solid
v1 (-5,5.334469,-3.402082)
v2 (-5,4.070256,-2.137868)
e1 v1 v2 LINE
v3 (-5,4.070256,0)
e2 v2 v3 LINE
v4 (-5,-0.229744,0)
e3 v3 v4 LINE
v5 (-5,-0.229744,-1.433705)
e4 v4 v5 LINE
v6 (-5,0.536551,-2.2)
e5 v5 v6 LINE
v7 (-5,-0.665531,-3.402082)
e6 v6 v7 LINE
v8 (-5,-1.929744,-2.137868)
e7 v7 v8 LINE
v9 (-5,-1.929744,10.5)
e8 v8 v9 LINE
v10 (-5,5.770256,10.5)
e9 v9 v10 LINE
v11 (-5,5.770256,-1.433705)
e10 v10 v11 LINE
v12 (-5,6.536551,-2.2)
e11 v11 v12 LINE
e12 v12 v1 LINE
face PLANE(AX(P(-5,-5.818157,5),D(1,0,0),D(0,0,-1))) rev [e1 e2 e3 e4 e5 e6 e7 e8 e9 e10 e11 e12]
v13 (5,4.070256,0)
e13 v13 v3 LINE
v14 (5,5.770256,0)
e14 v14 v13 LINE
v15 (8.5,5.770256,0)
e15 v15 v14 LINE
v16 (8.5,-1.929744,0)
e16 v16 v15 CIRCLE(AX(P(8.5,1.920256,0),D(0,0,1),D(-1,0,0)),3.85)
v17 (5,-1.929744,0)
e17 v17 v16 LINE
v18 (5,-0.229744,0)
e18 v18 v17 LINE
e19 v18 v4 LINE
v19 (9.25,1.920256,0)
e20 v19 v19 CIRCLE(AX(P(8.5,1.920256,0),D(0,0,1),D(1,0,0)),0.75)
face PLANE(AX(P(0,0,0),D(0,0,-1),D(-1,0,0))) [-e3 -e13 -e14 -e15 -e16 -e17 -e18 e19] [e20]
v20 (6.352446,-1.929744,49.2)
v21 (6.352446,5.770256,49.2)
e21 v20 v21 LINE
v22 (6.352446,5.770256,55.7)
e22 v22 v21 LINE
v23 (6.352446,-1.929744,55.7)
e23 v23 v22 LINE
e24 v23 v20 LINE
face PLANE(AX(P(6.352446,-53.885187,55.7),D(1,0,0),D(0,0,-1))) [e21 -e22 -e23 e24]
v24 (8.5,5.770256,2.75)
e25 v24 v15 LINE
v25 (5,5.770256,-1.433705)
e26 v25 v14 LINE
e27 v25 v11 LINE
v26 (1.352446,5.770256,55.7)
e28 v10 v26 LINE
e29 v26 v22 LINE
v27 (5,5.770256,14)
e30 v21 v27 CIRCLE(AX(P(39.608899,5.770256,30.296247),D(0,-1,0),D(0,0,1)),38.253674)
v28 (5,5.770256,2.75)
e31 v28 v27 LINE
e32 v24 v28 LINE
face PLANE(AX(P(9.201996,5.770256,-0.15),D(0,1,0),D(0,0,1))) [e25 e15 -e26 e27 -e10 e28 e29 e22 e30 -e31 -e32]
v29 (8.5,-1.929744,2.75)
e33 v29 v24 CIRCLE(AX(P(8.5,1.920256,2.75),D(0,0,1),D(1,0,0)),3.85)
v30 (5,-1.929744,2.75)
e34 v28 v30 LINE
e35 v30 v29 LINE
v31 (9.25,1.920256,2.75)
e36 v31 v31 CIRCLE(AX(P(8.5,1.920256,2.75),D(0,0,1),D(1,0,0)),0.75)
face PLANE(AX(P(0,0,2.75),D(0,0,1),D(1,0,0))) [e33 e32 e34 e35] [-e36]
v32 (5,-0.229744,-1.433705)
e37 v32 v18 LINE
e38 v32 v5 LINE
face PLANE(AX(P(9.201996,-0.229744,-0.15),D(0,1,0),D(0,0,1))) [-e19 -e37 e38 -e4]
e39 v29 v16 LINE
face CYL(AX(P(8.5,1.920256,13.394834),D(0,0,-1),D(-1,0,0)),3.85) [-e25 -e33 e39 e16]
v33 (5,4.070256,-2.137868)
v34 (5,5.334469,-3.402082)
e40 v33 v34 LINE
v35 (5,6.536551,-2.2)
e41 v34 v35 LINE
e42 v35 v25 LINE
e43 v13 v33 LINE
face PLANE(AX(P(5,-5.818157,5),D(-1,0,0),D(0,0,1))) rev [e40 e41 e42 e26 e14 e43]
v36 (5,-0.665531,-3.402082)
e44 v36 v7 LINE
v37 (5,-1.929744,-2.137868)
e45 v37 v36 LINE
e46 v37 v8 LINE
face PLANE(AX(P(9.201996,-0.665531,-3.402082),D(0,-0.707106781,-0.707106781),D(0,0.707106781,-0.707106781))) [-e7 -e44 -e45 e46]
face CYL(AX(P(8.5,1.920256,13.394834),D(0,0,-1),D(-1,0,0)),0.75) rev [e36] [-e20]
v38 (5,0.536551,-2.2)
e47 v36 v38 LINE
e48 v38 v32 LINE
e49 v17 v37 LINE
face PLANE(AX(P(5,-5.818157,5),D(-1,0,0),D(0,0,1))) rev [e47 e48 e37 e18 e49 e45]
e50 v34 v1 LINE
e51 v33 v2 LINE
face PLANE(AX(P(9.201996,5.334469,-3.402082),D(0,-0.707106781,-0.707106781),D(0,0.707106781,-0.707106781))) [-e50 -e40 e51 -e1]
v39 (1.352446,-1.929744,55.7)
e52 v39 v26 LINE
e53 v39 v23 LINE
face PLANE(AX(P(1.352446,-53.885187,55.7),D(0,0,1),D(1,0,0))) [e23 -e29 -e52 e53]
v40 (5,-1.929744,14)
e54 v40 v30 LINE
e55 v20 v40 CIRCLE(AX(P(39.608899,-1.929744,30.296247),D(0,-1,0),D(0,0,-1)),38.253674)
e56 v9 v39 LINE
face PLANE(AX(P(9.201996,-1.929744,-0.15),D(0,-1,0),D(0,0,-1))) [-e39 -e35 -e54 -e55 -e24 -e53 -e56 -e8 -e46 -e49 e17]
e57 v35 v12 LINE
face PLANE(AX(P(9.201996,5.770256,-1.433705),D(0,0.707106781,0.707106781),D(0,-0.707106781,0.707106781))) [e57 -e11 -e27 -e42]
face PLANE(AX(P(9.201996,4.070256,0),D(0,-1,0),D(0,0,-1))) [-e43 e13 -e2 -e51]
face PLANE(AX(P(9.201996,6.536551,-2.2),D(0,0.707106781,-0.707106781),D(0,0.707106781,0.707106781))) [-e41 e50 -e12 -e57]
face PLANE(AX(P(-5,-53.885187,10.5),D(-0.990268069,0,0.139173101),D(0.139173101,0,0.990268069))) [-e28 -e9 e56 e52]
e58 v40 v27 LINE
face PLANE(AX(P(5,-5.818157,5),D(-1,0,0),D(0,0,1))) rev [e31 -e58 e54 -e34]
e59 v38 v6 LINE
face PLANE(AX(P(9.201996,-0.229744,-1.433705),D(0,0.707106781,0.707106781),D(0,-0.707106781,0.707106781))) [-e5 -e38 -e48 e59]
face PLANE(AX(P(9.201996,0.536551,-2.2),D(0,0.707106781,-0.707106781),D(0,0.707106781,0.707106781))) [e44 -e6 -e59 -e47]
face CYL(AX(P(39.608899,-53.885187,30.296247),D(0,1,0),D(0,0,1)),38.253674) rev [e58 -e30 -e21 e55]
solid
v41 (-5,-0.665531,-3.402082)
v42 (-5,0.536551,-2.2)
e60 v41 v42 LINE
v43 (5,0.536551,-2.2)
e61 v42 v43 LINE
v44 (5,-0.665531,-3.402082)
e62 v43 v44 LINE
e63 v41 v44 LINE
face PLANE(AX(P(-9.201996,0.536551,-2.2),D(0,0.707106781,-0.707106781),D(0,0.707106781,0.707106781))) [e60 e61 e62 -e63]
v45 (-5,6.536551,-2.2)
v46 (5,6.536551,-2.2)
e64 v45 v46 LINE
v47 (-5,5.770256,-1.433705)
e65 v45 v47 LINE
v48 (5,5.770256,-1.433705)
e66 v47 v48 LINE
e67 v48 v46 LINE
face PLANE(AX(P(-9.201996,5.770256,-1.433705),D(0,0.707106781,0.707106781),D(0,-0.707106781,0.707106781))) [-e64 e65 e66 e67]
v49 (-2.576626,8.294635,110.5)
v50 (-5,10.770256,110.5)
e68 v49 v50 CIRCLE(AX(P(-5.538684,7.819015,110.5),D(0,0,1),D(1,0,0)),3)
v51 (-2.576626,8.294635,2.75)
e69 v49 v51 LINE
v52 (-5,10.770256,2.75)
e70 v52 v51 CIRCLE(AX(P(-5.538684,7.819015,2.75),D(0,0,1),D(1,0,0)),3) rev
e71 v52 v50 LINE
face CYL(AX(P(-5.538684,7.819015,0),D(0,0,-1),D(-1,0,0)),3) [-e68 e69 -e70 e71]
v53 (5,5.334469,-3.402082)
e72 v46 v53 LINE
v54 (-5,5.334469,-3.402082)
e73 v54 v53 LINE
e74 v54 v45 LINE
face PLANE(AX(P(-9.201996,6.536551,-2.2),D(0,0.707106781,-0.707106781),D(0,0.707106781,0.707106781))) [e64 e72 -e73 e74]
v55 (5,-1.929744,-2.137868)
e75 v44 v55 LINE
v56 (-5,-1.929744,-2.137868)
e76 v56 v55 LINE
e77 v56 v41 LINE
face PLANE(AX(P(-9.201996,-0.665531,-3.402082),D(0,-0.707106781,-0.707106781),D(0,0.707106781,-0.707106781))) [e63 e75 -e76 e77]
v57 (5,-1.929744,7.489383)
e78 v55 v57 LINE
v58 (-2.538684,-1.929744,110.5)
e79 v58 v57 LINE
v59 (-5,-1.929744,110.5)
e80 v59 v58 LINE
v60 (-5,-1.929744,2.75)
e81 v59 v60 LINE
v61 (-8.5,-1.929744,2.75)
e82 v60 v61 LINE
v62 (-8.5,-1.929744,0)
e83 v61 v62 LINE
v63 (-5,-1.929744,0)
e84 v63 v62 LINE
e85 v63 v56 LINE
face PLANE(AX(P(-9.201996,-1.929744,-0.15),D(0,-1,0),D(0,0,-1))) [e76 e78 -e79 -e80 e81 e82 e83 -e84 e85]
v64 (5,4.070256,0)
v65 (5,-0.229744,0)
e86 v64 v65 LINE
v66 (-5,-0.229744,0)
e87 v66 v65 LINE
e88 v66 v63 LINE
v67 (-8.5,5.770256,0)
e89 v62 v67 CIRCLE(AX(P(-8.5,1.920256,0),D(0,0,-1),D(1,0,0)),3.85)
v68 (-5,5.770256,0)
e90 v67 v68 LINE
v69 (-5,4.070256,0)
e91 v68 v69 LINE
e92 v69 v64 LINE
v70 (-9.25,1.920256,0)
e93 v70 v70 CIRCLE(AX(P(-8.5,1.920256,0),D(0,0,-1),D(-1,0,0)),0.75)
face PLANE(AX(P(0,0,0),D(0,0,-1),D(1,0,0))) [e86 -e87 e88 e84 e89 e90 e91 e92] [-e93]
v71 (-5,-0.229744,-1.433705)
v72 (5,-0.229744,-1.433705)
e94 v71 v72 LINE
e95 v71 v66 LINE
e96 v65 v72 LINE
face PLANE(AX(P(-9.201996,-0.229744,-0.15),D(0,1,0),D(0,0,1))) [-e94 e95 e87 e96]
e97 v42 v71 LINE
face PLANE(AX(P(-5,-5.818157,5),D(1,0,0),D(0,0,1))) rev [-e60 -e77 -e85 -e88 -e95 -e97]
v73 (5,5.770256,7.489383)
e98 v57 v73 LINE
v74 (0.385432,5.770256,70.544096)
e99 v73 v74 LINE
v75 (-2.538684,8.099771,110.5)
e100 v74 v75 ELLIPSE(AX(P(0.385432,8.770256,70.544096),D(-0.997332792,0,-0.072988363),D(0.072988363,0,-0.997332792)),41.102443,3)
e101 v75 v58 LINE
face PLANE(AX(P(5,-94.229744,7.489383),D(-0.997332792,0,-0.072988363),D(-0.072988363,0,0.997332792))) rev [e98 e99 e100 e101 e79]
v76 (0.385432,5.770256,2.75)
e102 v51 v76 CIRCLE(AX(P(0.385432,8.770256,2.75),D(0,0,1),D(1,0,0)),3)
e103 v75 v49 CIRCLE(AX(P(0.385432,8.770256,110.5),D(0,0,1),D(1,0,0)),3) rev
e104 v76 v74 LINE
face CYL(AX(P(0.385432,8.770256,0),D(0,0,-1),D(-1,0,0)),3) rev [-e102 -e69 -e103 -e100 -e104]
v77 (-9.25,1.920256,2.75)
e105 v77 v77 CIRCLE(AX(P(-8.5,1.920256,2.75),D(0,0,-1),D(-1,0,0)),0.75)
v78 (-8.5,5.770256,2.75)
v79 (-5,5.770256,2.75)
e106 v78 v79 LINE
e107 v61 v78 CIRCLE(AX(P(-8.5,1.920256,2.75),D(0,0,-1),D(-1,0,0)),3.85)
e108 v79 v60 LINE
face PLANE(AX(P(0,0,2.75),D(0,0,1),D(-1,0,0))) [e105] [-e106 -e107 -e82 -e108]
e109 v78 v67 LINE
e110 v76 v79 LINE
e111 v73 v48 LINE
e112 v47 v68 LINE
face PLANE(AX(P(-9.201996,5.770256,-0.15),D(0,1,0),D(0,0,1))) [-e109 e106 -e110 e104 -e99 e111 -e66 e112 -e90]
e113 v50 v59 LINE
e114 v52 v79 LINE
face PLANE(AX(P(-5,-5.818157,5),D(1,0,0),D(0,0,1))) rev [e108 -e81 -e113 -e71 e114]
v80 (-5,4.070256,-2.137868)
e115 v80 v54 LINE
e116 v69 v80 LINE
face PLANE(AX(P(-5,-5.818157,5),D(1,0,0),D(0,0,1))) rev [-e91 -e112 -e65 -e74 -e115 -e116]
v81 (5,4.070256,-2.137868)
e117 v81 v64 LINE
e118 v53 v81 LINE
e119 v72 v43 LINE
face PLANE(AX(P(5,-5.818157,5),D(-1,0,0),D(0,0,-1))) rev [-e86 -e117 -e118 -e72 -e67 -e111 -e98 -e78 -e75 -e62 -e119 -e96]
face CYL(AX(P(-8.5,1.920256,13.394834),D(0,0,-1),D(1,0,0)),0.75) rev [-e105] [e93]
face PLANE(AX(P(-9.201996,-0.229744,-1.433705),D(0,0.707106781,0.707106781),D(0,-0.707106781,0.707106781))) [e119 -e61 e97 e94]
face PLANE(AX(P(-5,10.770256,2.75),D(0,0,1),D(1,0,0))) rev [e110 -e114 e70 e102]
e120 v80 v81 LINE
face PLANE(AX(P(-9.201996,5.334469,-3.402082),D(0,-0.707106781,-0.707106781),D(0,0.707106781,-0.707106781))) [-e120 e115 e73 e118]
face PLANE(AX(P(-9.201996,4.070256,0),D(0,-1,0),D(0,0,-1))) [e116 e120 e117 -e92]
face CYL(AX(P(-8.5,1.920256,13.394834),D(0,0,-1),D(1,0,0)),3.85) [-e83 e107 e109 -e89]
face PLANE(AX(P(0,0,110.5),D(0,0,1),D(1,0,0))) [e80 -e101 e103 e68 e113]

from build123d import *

# Parameters (mm, degrees)
SKETCH2_W           = 10
SKETCH2_H           = 14.768412439
BOSS_EXTRUDE1_DEPTH = 5
BOSS_EXTRUDE4_DEPTH = 10
SKETCH9_W           = 10
SKETCH9_H           = 3.18
SKETCH9_H_2         = 3.888412439
CUT_EXTRUDE3_DEPTH  = 5
BOSS_EXTRUDE5_DEPTH = 7.7
SKETCH12_R          = 0.75
BOSS_EXTRUDE7_DEPTH = 2.75
FILLET1_R           = 2.5
SKETCH13_W          = 13.67386451
SKETCH13_H          = 47.62797089
CUT_EXTRUDE4_DEPTH  = 100
SKETCH14_W          = 10
SKETCH14_H          = 7.7
BOSS_EXTRUDE8_DEPTH = 100
CUT_EXTRUDE5_DEPTH  = 100
SKETCH16_W          = 2.461316474
SKETCH16_H          = 107.75
BOSS_EXTRUDE9_DEPTH = 5
FILLET3_R           = 3
FILLET4_R           = 3


with BuildPart() as part:
    # Sketch2 → Boss-Extrude1 (new body)
    with BuildSketch(Plane.XY):
        with Locations((0, 1.566049366)):
            Rectangle(SKETCH2_W, SKETCH2_H)
    extrude(amount=BOSS_EXTRUDE1_DEPTH)

    # Sketch8 → Boss-Extrude4 (add)
    with BuildSketch(Plane.ZY.offset(5)):
        Polygon((-0.15, 5.770255585), (0, 5.770255585), (0, 4.070255585), (-0.15, 4.070255585), (-2.137867966, 4.070255585), (-3.402081528, 5.334469147), (-2.2, 6.536550675), (-1.43370491, 5.770255585), align=None)
        Polygon((-0.15, -1.929744415), (0, -1.929744415), (0, -0.229744415), (-0.15, -0.229744415), (-1.43370491, -0.229744415), (-2.2, 0.536550675), (-3.402081528, -0.665530853), (-2.137867966, -1.929744415), align=None)
    extrude(amount=-BOSS_EXTRUDE4_DEPTH)

    # Sketch9 → Cut-Extrude3 (cut)
    with BuildSketch(Plane(origin=(0, 0, 0), x_dir=(-1, 0, 0), z_dir=(0, 0, -1))):
        with Locations((0, 7.360255585)):
            Rectangle(SKETCH9_W, SKETCH9_H)
        with Locations((0, -3.873950635)):
            Rectangle(SKETCH9_W, SKETCH9_H_2)
    extrude(amount=-CUT_EXTRUDE3_DEPTH, mode=Mode.SUBTRACT)

    # Sketch10 → Boss-Extrude5 (add)
    with BuildSketch(Plane(origin=(0, 5.770255585, 0), x_dir=(1, 0, 0), z_dir=(0, 1, 0))):
        with BuildLine():
            Line((-5, -5), (-5, -10.5))
            Line((-5, -10.5), (1.352445729, -55.7))
            Line((1.352445729, -55.7), (6.352445729, -55.7))
            Line((6.352445729, -55.7), (6.352445729, -49.2))
            ThreePointArc((6.352445729, -49.2), (1.383429579, -31.764936646), (5, -14))
            Line((5, -14), (5, -5))
            Line((5, -5), (-5, -5))
        make_face()
    extrude(amount=-BOSS_EXTRUDE5_DEPTH)

    # Sketch12 → Boss-Extrude7 (add)
    with BuildSketch(Plane.XY):
        with BuildLine():
            Line((5, 5.770255585), (8.5, 5.770255585))
            ThreePointArc((8.5, 5.770255585), (12.35, 1.920255585), (8.5, -1.929744415))
            Line((8.5, -1.929744415), (5, -1.929744415))
            Line((5, -1.929744415), (5, 5.770255585))
        make_face()
        with Locations((8.5, 1.920255585)):
            Circle(SKETCH12_R, mode=Mode.SUBTRACT)
    extrude(amount=BOSS_EXTRUDE7_DEPTH)


with BuildPart() as body_2:
    # Mirror1: mirrored copy
    add(part.part.mirror(Plane(origin=(0, 0, 0), x_dir=(0, 0, 1), z_dir=(1, 0, 0))))

    # Fillet1
    fillet1_edges = [body_2.edges().sort_by_distance(p)[0] for p in [
        (-6.352445729, 1.920255585, 49.2),
        (-5, 1.920255585, 14),
        (-1.352445729, 1.920255585, 55.7),
        (-6.352445729, 1.920255585, 55.7),
    ]]
    fillet(fillet1_edges, radius=FILLET1_R)

    # Sketch13 → Cut-Extrude4 (cut)
    with BuildSketch(Plane(origin=(0, 5.770255585, 0), x_dir=(1, 0, 0), z_dir=(0, 1, 0))):
        with Locations((-1.836932255, -34.313985445)):
            Rectangle(SKETCH13_W, SKETCH13_H)
    extrude(amount=-CUT_EXTRUDE4_DEPTH, mode=Mode.SUBTRACT)

    # Sketch14 → Boss-Extrude8 (add)
    with BuildSketch(Plane.XY.offset(10.5)):
        with Locations((0, 1.920255585)):
            Rectangle(SKETCH14_W, SKETCH14_H)
    extrude(amount=BOSS_EXTRUDE8_DEPTH)

    # Sketch15 → Cut-Extrude5 (cut)
    with BuildSketch(Plane(origin=(0, 5.770255585, 0), x_dir=(1, 0, 0), z_dir=(0, 1, 0))):
        Polygon((5, -7.489382654), (-2.538683526, -110.5), (5, -110.5), align=None)
    extrude(amount=-CUT_EXTRUDE5_DEPTH, mode=Mode.SUBTRACT)

    # Sketch16 → Boss-Extrude9 (add)
    with BuildSketch(Plane(origin=(0, 5.770255585, 0), x_dir=(1, 0, 0), z_dir=(0, 1, 0))):
        with Locations((-3.769341763, -56.625)):
            Rectangle(SKETCH16_W, SKETCH16_H)
    extrude(amount=BOSS_EXTRUDE9_DEPTH)

    # Fillet3
    # the kernel refuses this fillet: 3 mm, written as the material it takes off along each edge
    with BuildSketch(Plane(origin=(-2.538683526, 10.770255585, -4.628101068), x_dir=(-1, 0, 0), z_dir=(0, 0, 1))) as fillet3_piece_1:
        with BuildLine():
            CenterArc((3, 2.951240427), FILLET3_R, 180, 79.655799439)
            Line((0, 2.951240427), (-0.06, 2.951240427))
            Line((-0.06, 2.951240427), (-0.06, 0))
            Line((-0.06, 0), (0, -0.06))
            ThreePointArc((0, -0.06), (1.230658237, -0.06), (2.450542803, -0.059024809))
            Line((2.450542803, -0.059024809), (2.461316474, 0))
        make_face()
    extrude(amount=122.506202136, mode=Mode.SUBTRACT)

    # Fillet4
    # the kernel refuses this fillet: 3 mm, written as the material it adds along each edge
    with BuildSketch(Plane(origin=(-2.538683526, 5.770255585, 2.75), x_dir=(1, 0, 0), z_dir=(0, 0, 1))) as fillet4_piece_1_section:
        with BuildLine():
            CenterArc((2.924115263, 3), FILLET4_R, 189.122166889, 80.877833111)
            Line((-0.037942368, 2.524379786), (-0.334148132, 2.476817765))
            ThreePointArc((-0.334148132, 2.476817765), (-0.3, 2.048759573), (-0.3, 0))
            Line((-0.3, 0), (0, -0.3))
            Line((0, -0.3), (2.924115263, -0.3))
            Line((2.924115263, -0.3), (2.924115263, 0))
        make_face()
    fillet4_piece_1 = extrude(amount=107.75, mode=Mode.PRIVATE)
    fillet4_piece_1 = split(fillet4_piece_1, bisect_by=Plane(origin=(1.704380037, 6.352962356, 52.521628105), z_dir=(-0.9973327924630033, 0, -0.07298836261999549)), keep=Keep.TOP, mode=Mode.PRIVATE)
    add(fillet4_piece_1)


solid = Compound([part.part, body_2.part])
